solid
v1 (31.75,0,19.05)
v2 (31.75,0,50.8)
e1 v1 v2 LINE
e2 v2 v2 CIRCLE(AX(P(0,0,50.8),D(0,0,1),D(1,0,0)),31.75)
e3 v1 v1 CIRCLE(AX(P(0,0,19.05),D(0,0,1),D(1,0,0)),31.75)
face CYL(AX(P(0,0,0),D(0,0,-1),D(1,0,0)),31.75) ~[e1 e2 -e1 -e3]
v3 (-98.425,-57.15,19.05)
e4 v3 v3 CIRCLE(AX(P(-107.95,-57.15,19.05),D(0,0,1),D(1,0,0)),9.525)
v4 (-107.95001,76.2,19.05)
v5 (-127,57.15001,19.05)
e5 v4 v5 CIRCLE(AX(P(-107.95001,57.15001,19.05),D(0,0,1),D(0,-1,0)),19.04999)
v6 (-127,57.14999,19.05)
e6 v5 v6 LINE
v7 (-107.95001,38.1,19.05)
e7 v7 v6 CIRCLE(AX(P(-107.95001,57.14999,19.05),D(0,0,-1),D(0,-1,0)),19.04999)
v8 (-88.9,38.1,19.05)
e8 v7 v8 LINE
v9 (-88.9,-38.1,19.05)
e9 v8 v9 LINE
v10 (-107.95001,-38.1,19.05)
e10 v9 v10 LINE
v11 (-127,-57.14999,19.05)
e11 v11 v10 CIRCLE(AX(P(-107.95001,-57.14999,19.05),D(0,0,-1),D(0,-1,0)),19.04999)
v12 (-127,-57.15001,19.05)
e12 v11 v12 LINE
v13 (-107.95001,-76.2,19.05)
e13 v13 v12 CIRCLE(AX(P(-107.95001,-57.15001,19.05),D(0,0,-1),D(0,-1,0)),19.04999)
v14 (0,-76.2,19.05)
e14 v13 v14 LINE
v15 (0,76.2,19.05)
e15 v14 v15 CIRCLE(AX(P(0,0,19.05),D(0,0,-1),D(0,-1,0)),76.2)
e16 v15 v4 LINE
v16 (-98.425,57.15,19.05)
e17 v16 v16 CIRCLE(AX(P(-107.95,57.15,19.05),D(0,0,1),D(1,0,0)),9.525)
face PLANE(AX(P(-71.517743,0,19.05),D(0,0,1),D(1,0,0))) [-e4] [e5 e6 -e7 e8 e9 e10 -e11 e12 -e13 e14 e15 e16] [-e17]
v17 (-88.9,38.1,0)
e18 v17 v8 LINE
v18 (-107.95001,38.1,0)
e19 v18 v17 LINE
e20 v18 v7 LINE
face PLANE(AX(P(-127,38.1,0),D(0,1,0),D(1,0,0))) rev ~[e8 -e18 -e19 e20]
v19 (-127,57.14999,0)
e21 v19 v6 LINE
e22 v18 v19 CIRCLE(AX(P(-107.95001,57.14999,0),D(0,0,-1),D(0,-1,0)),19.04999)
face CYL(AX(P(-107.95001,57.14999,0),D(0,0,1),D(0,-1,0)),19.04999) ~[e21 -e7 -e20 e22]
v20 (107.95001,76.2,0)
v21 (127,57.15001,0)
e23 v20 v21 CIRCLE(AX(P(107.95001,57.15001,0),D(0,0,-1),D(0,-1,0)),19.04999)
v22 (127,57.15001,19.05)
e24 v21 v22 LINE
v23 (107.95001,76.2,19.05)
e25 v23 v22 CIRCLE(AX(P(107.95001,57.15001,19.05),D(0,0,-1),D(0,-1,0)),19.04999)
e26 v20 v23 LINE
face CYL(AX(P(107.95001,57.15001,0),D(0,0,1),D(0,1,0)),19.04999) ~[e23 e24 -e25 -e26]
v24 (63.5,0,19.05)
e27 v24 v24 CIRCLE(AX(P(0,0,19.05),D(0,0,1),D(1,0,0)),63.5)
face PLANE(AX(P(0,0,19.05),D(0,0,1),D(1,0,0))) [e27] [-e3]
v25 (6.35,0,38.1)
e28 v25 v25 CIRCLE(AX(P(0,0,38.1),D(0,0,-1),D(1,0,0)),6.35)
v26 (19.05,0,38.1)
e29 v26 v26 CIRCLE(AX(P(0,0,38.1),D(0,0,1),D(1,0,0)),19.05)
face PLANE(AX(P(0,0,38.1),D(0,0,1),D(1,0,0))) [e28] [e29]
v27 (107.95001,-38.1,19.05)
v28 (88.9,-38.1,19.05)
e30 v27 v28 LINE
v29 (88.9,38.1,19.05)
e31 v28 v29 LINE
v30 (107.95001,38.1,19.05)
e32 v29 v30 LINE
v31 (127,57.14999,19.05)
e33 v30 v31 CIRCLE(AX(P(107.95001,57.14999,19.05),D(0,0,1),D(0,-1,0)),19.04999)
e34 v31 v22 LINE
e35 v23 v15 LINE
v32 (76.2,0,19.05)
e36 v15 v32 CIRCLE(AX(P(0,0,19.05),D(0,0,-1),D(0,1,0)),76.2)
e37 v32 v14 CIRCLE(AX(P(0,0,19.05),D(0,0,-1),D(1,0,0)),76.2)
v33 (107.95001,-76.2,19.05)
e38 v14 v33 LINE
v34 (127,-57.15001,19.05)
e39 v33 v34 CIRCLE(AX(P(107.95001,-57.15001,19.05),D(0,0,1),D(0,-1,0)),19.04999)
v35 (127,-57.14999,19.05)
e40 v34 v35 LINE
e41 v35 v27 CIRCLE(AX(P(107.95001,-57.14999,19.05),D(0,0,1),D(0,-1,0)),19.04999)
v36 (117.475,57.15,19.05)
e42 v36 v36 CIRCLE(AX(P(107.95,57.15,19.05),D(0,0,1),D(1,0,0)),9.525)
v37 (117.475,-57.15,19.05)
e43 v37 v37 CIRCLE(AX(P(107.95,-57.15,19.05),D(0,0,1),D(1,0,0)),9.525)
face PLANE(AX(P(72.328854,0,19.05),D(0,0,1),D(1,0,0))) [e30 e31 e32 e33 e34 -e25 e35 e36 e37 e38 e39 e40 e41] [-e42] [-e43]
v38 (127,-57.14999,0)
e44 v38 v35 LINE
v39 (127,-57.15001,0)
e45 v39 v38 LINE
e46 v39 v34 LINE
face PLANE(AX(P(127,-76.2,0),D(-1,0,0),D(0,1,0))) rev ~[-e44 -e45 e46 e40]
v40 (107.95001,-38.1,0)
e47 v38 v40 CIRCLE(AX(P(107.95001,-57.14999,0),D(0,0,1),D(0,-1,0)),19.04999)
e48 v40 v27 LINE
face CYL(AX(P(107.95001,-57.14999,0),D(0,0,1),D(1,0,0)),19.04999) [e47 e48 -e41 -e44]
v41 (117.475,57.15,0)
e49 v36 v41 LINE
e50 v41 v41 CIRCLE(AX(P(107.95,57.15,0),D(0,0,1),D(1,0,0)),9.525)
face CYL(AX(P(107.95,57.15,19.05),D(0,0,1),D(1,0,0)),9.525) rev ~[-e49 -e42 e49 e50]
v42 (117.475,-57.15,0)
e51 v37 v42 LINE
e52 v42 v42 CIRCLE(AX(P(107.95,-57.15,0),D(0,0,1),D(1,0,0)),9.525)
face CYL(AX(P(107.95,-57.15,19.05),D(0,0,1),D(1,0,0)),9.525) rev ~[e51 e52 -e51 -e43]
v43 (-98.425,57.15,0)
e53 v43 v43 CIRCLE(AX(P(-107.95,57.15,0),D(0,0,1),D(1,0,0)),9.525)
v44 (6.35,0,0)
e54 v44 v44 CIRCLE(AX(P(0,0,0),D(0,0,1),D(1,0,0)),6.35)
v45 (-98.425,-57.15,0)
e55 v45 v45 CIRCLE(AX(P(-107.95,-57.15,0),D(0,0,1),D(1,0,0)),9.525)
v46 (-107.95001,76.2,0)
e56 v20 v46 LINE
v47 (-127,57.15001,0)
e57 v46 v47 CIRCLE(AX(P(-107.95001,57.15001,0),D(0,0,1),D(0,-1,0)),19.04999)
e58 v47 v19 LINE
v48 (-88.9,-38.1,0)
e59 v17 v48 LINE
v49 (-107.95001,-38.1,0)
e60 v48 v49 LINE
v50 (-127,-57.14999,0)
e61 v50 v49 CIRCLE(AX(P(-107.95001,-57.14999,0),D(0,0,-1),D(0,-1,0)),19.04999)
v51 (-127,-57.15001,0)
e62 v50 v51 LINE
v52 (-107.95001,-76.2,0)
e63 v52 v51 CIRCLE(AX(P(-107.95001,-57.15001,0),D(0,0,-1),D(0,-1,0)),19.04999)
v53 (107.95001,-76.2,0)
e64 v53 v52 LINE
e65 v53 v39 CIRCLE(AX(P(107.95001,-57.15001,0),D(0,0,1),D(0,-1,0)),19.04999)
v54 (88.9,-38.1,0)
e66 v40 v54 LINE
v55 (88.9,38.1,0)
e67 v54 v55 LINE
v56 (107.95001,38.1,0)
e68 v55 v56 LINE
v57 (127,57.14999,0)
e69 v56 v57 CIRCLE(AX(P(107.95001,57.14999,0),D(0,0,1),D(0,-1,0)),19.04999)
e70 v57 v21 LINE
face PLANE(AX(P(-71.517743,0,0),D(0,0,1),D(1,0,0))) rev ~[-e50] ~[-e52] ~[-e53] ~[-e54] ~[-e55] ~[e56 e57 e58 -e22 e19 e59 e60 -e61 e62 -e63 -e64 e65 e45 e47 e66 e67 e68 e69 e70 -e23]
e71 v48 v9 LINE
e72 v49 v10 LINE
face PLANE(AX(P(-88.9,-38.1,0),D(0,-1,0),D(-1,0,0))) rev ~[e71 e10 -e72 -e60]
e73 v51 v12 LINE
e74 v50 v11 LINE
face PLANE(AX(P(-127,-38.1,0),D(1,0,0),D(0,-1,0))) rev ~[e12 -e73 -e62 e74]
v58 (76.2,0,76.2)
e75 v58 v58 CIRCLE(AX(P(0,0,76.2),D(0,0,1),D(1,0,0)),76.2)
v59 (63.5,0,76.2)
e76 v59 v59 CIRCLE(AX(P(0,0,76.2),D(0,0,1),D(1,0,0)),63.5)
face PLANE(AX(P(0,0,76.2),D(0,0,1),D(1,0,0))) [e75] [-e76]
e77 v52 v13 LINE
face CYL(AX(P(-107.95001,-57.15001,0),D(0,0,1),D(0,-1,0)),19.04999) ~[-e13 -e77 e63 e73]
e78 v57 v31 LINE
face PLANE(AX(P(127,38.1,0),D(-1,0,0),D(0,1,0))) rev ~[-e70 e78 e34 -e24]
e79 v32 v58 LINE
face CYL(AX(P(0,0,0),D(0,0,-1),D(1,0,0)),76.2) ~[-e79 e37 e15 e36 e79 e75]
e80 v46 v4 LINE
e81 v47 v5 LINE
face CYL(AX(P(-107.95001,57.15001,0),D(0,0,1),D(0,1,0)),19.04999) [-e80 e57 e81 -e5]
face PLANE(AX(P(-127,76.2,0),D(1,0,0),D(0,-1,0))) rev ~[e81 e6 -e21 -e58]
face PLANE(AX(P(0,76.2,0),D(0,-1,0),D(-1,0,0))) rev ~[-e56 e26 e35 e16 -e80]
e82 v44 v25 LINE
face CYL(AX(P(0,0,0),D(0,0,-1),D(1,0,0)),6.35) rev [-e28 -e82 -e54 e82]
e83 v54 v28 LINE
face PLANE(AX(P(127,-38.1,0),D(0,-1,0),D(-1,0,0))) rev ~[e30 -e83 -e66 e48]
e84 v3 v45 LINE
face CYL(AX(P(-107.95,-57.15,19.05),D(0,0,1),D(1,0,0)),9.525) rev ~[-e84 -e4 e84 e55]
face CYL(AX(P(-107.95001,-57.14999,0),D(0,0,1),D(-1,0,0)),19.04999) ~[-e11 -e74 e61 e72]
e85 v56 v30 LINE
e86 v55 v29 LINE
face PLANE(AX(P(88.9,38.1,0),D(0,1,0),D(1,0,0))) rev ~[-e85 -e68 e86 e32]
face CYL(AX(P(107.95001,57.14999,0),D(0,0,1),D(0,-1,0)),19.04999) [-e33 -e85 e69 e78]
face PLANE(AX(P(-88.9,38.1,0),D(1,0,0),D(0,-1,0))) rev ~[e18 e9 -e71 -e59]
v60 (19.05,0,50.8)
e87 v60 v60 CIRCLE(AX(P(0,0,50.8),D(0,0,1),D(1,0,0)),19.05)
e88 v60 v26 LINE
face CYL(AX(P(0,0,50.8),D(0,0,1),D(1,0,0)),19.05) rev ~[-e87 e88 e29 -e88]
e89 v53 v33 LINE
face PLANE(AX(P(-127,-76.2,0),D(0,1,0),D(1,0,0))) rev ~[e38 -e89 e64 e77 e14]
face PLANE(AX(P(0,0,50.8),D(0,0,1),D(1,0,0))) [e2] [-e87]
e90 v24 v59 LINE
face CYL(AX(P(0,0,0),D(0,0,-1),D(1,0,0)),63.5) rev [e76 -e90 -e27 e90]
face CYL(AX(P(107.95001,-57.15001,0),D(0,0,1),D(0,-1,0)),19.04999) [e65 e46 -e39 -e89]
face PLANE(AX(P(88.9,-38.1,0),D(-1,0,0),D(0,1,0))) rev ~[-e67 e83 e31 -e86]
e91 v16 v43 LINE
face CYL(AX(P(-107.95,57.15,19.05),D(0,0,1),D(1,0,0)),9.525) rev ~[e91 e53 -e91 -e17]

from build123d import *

# Parameters (mm, degrees)
F1_DEPTH  = 19.05
F0_R      = 63.5
F2_DEPTH  = 76.2
F0_R_2    = 31.75
F3_DEPTH  = 19.05
F0_R_3    = 19.05
F0_R_4    = 6.35
F4_DEPTH  = 50.8
F5_R      = 19.05
F6_DEPTH  = 12.7
F7_DEPTH  = 76.201
F8_DEPTH  = 19.05
F9_R      = 19.04999
F10_R     = 9.525
F11_DEPTH = 19.05


# Not quite as in the source:
# - a fillet or chamfer is up to 0.001 mm smaller than in the source, because OpenCascade refuses the exact size


with BuildPart() as f1:
    # F0 (on Top) → F1 (new body)
    with BuildSketch(Plane.XY):
        with BuildLine():
            ThreePointArc((0, 76.2), (53.8815367264, 53.8815367264), (76.2, 0))
            ThreePointArc((76.2, 0), (53.8815367264, -53.8815367264), (0, -76.2))
            Line((0, -76.2), (127, -76.2))
            Line((127, -76.2), (127, -38.1))
            Line((127, -38.1), (88.9, -38.1))
            Line((88.9, -38.1), (88.9, 38.1))
            Line((88.9, 38.1), (127, 38.1))
            Line((127, 38.1), (127, 76.2))
            Line((127, 76.2), (0, 76.2))
        make_face()
    extrude(amount=F1_DEPTH)

    # F0 (on Top) → F2 (join)
    with BuildSketch(Plane.XY):
        with BuildLine():
            ThreePointArc((0, -76.2), (53.8815367264, -53.8815367264), (76.2, 0))
            ThreePointArc((76.2, 0), (53.8815367264, 53.8815367264), (0, 76.2))
            ThreePointArc((0, 76.2), (-76.2, 0), (0, -76.2))
        make_face()
        Circle(F0_R, mode=Mode.SUBTRACT)
    extrude(amount=F2_DEPTH)

    # F0 (on Top) → F3 (join)
    with BuildSketch(Plane.XY):
        Circle(F0_R)
        Circle(F0_R_2, mode=Mode.SUBTRACT)
    extrude(amount=F3_DEPTH)

    # F0 (on Top) → F4 (join)
    with BuildSketch(Plane.XY):
        Circle(F0_R_2)
        Circle(F0_R_3, mode=Mode.SUBTRACT)
        Circle(F0_R_3)
        Circle(F0_R_4, mode=Mode.SUBTRACT)
        Circle(F0_R_4)
    extrude(amount=F4_DEPTH)

    # F5 (on face) → F6 (cut)
    with BuildSketch(Plane.XY.offset(50.8)):
        Circle(F5_R)
    extrude(amount=-F6_DEPTH, mode=Mode.SUBTRACT)

    # F0 (on Top) → F7 (cut, through all)
    with BuildSketch(Plane.XY):
        Circle(F0_R_4)
    extrude(amount=F7_DEPTH, mode=Mode.SUBTRACT)

    # F0 (on Top) → F8 (join)
    with BuildSketch(Plane.XY):
        with BuildLine():
            ThreePointArc((0, -76.2), (-76.2, 0), (0, 76.2))
            Line((0, 76.2), (-127, 76.2))
            Line((-127, 76.2), (-127, 38.1))
            Line((-127, 38.1), (-88.9, 38.1))
            Line((-88.9, 38.1), (-88.9, -38.1))
            Line((-88.9, -38.1), (-127, -38.1))
            Line((-127, -38.1), (-127, -76.2))
            Line((-127, -76.2), (0, -76.2))
        make_face()
    extrude(amount=F8_DEPTH)

    # F9 (radius 19.05 in the source; OpenCascade refuses exactly that, so slightly less here)
    f9_edges = [f1.edges().sort_by_distance(p)[0] for p in [
        (-127, -76.2, 9.525),
        (-127, -38.1, 9.525),
        (-127, 38.1, 9.525),
        (-127, 76.2, 9.525),
        (127, 38.1, 9.525),
        (127, 76.2, 9.525),
        (127, -76.2, 9.525),
        (127, -38.1, 9.525),
    ]]
    fillet(f9_edges, radius=F9_R)

    # F10 (on face) → F11 (cut, through all)
    with BuildSketch(Plane.XY.offset(19.05)):
        with Locations((-107.95, -57.15)):
            Circle(F10_R)
        with Locations((-107.95, 57.15)):
            Circle(F10_R)
        with Locations((107.95, 57.15)):
            Circle(F10_R)
        with Locations((107.95, -57.15)):
            Circle(F10_R)
    extrude(amount=-F11_DEPTH, mode=Mode.SUBTRACT)


solid = f1.part
